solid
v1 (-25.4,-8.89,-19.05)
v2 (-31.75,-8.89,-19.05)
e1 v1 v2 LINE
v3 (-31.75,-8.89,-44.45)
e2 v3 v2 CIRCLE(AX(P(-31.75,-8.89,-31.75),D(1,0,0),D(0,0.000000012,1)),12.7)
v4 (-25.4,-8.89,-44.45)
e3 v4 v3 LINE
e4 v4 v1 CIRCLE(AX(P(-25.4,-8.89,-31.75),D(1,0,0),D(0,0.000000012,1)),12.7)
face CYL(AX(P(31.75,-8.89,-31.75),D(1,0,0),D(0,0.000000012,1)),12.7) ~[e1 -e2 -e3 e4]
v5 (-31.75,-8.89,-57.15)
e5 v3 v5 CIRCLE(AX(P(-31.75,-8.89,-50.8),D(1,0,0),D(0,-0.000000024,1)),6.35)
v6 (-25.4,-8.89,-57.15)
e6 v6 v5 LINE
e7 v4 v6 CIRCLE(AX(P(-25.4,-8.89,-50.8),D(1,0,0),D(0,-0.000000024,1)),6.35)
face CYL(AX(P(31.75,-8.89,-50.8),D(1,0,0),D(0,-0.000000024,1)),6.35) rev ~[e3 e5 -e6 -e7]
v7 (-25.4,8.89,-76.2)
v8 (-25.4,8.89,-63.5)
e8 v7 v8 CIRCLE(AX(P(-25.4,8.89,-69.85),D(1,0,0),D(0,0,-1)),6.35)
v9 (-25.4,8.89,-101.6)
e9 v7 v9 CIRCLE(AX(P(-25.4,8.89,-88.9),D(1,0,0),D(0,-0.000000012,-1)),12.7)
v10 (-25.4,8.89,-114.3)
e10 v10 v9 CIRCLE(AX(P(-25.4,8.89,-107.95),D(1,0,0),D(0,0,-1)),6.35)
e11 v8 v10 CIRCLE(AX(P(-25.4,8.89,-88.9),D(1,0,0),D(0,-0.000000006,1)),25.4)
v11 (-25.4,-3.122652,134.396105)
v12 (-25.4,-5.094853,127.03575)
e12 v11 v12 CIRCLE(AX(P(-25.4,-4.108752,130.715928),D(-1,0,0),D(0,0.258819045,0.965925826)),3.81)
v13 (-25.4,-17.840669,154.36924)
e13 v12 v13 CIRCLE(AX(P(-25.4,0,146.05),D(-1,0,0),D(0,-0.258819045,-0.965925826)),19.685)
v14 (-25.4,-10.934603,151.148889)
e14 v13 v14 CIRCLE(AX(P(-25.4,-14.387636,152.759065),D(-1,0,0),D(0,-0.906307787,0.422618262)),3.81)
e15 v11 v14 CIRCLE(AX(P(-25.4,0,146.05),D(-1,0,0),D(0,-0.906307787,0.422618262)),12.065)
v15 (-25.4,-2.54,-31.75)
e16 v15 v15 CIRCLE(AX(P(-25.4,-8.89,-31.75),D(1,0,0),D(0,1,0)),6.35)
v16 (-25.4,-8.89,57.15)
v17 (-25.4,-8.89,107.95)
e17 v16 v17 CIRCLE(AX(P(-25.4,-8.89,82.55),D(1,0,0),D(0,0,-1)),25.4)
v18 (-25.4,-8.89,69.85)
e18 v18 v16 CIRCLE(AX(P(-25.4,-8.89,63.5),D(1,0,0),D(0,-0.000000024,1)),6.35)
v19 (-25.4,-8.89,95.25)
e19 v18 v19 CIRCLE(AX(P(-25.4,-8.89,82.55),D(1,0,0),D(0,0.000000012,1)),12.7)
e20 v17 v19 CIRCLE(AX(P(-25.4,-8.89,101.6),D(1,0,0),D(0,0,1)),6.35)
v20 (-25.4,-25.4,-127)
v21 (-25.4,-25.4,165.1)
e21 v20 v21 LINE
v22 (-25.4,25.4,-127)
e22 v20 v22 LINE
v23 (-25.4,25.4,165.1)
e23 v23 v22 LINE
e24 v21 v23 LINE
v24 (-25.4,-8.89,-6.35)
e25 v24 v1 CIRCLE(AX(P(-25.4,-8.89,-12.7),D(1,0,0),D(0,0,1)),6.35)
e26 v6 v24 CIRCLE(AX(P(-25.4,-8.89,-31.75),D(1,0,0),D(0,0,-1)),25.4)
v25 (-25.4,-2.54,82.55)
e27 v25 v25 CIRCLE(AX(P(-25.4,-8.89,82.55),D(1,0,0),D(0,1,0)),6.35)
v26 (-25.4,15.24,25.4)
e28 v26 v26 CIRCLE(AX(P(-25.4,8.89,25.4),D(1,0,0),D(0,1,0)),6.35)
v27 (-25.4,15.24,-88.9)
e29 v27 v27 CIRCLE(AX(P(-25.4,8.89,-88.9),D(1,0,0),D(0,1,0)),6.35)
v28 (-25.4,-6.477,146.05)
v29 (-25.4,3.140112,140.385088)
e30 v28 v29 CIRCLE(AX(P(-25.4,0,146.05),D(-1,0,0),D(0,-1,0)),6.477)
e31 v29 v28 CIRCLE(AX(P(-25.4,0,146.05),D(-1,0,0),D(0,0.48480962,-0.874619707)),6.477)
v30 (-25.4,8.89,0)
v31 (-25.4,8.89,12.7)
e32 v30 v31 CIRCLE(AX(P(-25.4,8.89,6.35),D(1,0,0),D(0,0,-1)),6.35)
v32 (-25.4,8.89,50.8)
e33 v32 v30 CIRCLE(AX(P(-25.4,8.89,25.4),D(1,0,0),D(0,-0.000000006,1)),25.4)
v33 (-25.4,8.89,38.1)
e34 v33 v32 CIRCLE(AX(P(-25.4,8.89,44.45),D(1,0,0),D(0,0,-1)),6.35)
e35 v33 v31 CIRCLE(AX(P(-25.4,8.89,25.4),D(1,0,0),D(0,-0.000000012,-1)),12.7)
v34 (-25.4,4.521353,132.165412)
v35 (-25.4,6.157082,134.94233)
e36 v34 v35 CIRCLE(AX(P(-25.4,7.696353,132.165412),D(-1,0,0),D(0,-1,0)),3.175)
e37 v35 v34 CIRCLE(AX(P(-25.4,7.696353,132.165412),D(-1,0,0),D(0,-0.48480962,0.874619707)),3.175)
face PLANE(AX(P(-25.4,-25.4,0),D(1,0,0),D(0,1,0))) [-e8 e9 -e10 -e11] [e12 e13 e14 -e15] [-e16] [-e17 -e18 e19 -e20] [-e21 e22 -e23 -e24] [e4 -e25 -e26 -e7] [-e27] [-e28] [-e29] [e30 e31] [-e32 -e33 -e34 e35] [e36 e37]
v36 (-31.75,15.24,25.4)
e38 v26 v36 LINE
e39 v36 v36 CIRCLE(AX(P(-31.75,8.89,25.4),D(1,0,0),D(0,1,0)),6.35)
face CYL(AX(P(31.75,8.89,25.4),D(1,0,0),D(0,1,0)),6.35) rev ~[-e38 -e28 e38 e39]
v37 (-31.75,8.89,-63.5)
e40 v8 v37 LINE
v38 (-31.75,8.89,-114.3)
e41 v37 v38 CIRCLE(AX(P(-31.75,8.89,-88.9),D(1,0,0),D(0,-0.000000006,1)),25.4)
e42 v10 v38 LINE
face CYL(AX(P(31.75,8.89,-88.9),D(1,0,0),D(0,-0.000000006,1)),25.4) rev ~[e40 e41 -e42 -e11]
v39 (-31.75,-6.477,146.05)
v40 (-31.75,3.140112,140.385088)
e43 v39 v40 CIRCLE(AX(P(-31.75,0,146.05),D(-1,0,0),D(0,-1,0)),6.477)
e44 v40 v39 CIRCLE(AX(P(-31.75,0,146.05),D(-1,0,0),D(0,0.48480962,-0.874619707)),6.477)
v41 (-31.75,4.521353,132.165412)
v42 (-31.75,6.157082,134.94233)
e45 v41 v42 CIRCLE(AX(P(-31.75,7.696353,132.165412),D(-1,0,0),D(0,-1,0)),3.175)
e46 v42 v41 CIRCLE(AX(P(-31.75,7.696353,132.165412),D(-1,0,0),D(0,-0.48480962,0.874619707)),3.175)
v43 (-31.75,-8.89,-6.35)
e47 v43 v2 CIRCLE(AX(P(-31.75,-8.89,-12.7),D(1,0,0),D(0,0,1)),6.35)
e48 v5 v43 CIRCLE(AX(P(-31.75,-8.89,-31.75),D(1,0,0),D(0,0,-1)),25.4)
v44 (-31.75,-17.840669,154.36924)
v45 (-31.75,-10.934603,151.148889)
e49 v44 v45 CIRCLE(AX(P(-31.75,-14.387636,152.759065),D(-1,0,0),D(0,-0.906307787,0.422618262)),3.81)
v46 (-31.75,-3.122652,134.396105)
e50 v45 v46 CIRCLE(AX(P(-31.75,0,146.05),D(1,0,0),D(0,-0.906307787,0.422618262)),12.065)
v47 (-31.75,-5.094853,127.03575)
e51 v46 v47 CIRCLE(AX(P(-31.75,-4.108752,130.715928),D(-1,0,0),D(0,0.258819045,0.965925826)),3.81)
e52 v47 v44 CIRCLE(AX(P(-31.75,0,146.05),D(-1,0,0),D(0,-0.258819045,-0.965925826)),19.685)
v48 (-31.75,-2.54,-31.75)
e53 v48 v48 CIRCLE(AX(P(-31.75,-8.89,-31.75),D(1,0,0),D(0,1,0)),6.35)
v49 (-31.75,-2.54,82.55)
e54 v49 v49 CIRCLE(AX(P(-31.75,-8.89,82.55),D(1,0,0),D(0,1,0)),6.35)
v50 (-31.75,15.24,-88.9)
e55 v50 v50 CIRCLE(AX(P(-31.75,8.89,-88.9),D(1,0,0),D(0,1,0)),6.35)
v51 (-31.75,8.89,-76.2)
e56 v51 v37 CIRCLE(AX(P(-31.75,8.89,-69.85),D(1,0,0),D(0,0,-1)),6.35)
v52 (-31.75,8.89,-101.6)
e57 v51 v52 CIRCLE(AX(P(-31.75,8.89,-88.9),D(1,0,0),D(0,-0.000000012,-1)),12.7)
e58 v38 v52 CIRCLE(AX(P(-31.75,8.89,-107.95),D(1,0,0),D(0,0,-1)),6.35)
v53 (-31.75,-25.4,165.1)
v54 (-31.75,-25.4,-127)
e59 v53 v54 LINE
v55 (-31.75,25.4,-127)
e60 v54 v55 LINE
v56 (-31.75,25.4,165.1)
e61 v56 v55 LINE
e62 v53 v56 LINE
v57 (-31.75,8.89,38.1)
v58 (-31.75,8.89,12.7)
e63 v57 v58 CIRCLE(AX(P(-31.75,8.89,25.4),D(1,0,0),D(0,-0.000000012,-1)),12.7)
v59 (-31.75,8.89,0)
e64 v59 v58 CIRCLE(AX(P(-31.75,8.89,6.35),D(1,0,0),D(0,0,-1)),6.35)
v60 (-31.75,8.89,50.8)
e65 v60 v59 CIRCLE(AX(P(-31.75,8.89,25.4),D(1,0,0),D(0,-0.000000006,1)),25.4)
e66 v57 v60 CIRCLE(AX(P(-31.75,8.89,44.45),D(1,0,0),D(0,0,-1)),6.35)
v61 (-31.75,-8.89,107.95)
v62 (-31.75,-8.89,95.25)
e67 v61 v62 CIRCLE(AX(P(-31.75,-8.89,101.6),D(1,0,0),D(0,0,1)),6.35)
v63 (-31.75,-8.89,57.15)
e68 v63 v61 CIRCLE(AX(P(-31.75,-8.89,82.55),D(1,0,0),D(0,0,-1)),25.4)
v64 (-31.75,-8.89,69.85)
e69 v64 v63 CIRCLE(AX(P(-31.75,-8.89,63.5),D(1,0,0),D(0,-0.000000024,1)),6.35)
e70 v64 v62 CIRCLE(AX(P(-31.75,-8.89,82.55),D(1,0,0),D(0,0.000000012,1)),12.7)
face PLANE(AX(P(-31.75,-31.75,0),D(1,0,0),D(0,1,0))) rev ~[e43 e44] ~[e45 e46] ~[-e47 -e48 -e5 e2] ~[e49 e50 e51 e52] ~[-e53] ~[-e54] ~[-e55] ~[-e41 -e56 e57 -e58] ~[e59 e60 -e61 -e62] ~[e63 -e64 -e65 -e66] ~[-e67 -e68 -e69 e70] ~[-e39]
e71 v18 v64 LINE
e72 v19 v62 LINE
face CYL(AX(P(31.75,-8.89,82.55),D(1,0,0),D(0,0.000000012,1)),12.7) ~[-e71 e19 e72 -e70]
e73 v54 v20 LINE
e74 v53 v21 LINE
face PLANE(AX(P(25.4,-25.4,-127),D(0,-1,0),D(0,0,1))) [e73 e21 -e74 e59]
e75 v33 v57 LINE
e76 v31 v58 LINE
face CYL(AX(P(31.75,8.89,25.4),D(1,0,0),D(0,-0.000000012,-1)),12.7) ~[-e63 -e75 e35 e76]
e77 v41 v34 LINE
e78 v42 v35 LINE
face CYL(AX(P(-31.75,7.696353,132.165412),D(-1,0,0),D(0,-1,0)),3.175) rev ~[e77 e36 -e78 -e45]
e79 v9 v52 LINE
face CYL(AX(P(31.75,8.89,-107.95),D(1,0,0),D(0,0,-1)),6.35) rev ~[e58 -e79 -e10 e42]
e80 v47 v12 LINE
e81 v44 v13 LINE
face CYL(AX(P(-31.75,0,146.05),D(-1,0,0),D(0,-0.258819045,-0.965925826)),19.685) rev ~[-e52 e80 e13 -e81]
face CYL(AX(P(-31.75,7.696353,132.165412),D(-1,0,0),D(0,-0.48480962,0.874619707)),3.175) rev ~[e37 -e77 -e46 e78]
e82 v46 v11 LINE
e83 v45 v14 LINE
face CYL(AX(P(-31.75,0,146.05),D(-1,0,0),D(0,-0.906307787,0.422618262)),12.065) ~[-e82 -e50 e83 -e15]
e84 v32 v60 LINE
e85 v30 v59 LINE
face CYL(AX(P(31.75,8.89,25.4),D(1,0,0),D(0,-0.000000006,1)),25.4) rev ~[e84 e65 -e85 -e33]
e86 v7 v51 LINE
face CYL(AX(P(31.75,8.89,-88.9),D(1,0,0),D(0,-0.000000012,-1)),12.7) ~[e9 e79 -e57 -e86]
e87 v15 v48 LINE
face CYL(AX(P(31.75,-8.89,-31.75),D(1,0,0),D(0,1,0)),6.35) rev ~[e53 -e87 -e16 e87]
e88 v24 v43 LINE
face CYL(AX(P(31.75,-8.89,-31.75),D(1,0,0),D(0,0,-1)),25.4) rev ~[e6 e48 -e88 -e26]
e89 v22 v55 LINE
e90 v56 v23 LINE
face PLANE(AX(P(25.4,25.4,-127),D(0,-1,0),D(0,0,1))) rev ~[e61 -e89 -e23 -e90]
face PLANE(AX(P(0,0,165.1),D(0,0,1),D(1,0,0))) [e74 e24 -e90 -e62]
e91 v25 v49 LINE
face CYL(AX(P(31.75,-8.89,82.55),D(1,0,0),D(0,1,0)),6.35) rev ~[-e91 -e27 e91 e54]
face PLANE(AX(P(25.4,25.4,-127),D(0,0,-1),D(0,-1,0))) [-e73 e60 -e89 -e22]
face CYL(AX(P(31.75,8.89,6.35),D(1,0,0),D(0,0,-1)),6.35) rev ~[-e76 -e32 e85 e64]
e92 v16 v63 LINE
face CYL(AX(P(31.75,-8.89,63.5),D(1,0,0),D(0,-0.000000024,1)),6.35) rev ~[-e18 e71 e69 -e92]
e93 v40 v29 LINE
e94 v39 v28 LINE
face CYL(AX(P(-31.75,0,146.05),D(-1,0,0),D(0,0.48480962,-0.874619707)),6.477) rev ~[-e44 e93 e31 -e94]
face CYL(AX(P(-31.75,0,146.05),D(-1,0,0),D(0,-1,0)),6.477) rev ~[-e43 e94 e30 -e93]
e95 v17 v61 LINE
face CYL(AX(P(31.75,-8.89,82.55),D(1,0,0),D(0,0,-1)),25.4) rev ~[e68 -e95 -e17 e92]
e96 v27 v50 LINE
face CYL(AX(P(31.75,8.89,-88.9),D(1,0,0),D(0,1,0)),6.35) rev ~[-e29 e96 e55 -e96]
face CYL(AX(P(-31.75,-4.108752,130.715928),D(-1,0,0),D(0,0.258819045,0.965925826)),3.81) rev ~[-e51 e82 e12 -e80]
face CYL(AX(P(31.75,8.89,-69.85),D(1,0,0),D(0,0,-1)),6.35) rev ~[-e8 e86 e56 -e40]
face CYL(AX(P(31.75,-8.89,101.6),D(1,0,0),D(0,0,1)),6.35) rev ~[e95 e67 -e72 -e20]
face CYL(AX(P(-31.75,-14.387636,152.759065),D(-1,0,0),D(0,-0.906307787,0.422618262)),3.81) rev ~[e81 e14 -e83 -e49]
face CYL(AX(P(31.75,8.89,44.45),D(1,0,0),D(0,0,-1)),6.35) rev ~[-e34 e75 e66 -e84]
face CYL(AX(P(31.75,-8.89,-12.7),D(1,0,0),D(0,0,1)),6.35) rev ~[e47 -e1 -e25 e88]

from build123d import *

# Parameters (mm, degrees)
F0_W      = 63.5
F0_H      = 63.5
F0_W_2    = 50.8
F0_H_2    = 50.8
F1_DEPTH  = 165.1
F3_R      = 6.477
F4_DEPTH  = 25.4
F6_DEPTH  = 25.4
F7_R      = 6.35
F8_DEPTH  = 63.501
F9_W      = 145.7979530096
F9_H      = 377.9422044754
F9_W_2    = 50.8
F9_H_2    = 292.1
F10_DEPTH = 63.5
F11_W     = 97.6704657078
F11_H     = 338.8985395432
F12_DEPTH = 57.151


# Not quite as in the source:
# - ends of sketch curves that miss each other by under 0.0002 mm in the source are joined


with BuildPart() as f1:
    # F0 (on Top) → F1 (new body, symmetric)
    with BuildSketch(Plane.XY):
        Rectangle(F0_W, F0_H)
        Rectangle(F0_W_2, F0_H_2, mode=Mode.SUBTRACT)
    extrude(amount=F1_DEPTH, both=True)

    # F3 (on face) → F4 (cut)
    with BuildSketch(Plane.YZ.offset(31.75)):
        with Locations((0, 146.05)):
            Circle(F3_R)
        with BuildLine():
            ThreePointArc((10.1385245046, 129.1766616857), (14.6288058895, 132.8781640138), (17.8406687878, 137.7307595176))
            ThreePointArc((17.8406687878, 137.7307595176), (19.4934269332, 143.3103775076), (19.4426449846, 149.1294124443))
            ThreePointArc((19.4426449846, 149.1294124443), (15.0835370951, 152.2964897102), (11.9164598293, 147.9373818207))
            ThreePointArc((11.9164598293, 147.9373818207), (11.9475842494, 144.3708765369), (10.9346034506, 140.9511106721))
            ThreePointArc((10.9346034506, 140.9511106721), (8.9660423194, 137.9769392343), (6.2139343738, 135.708276517))
            ThreePointArc((6.2139343738, 135.708276517), (4.9104220235, 130.4801740359), (10.1385245046, 129.1766616857))
        make_face()
        with BuildLine():
            ThreePointArc((-10.1385245046, 129.1766616857), (-4.9104220235, 130.4801740359), (-6.2139343738, 135.708276517))
            ThreePointArc((-6.2139343738, 135.708276517), (-8.9660423194, 137.9769392343), (-10.9346034506, 140.9511106721))
            ThreePointArc((-10.9346034506, 140.9511106721), (-11.9475842494, 144.3708765369), (-11.9164598293, 147.9373818207))
            ThreePointArc((-11.9164598293, 147.9373818207), (-15.0835370951, 152.2964897102), (-19.4426449846, 149.1294124443))
            ThreePointArc((-19.4426449846, 149.1294124443), (-19.4934269332, 143.3103775076), (-17.8406687878, 137.7307595176))
            ThreePointArc((-17.8406687878, 137.7307595176), (-14.6288058895, 132.8781640138), (-10.1385245046, 129.1766616857))
        make_face()
    extrude(amount=-F4_DEPTH, mode=Mode.SUBTRACT)

    # F5 (on face) → F6 (cut)
    with BuildSketch(Plane(origin=(-31.75, 0, 0), x_dir=(0, -1, 0), z_dir=(-1, 0, 0))):
        with BuildLine():
            ThreePointArc((-3.1401119103, 140.3850881569), (3.2873259769, 140.4692279278), (6.477, 146.05))
            ThreePointArc((6.477, 146.05), (-3.2873259769, 151.6307720722), (-3.1401119103, 140.3850881569))
        make_face()
        with BuildLine():
            ThreePointArc((-4.5213527214, 132.1654121492), (-4.960680137, 133.7768464516), (-6.1570821771, 134.9423297193))
            ThreePointArc((-6.1570821771, 134.9423297193), (-10.4320253058, 130.5539778468), (-4.5213527214, 132.1654121492))
        make_face()
        with BuildLine():
            ThreePointArc((3.1226517792, 134.3961049058), (0.4285749428, 129.7298269458), (5.0948529028, 127.0357501095))
            ThreePointArc((5.0948529028, 127.0357501095), (17.8406687878, 137.7307595176), (17.8406687878, 154.3692404824))
            ThreePointArc((17.8406687878, 154.3692404824), (12.777460542, 156.2120975737), (10.9346034506, 151.1488893279))
            ThreePointArc((10.9346034506, 151.1488893279), (10.9346034506, 140.9511106721), (3.1226517792, 134.3961049058))
        make_face()
    extrude(amount=-F6_DEPTH, mode=Mode.SUBTRACT)

    # F7 (on face) → F8 (cut, through all)
    with BuildSketch(Plane.YZ.offset(31.75)):
        with BuildLine():
            ThreePointArc((-8.89, 107.949999693), (-15.239999693, 101.6), (-8.89, 95.250000307))
            ThreePointArc((-8.89, 95.250000307), (3.81, 82.55), (-8.89, 69.85))
            ThreePointArc((-8.89, 69.85), (-15.239999693, 63.5), (-8.89, 57.150000307))
            ThreePointArc((-8.89, 57.150000307), (16.509999693, 82.55), (-8.89, 107.949999693))
        make_face()
        with BuildLine():
            ThreePointArc((8.89, 3.07e-07), (15.239999693, 6.35), (8.89, 12.699999693))
            ThreePointArc((8.89, 12.699999693), (-3.81, 25.4), (8.89, 38.1))
            ThreePointArc((8.89, 38.1), (15.24, 44.45), (8.89, 50.8))
            ThreePointArc((8.89, 50.8), (-16.509999693, 25.4), (8.89, 3.07e-07))
        make_face()
        with BuildLine():
            ThreePointArc((-8.89, -6.350000307), (-15.239999693, -12.7), (-8.89, -19.049999693))
            ThreePointArc((-8.89, -19.049999693), (3.81, -31.75), (-8.89, -44.45))
            ThreePointArc((-8.89, -44.45), (-15.239999693, -50.8), (-8.89, -57.149999693))
            ThreePointArc((-8.89, -57.149999693), (16.509999693, -31.75), (-8.89, -6.350000307))
        make_face()
        with BuildLine():
            ThreePointArc((8.89, -114.299999693), (15.239999693, -107.95), (8.89, -101.600000307))
            ThreePointArc((8.89, -101.600000307), (-3.81, -88.9), (8.89, -76.2))
            ThreePointArc((8.89, -76.2), (15.24, -69.85), (8.89, -63.5))
            ThreePointArc((8.89, -63.5), (-16.509999693, -88.9), (8.89, -114.299999693))
        make_face()
        with Locations((-8.89, 82.55)):
            Circle(F7_R)
        with Locations((8.89, 25.4)):
            Circle(F7_R)
        with Locations((8.89, -88.9)):
            Circle(F7_R)
        with Locations((-8.89, -31.75)):
            Circle(F7_R)
    extrude(amount=-F8_DEPTH, mode=Mode.SUBTRACT)

    # F9 (on face) → F10 (cut, symmetric)
    with BuildSketch(Plane(origin=(25.4, 0, 0), x_dir=(0, -1, 0), z_dir=(-1, 0, 0))):
        Rectangle(F9_W, F9_H)
        with Locations((0, 19.05)):
            Rectangle(F9_W_2, F9_H_2, mode=Mode.SUBTRACT)
    extrude(amount=F10_DEPTH, both=True, mode=Mode.SUBTRACT)

    # F11 (on face) → F12 (cut, through all)
    with BuildSketch(Plane.YZ.offset(-25.4)):
        Rectangle(F11_W, F11_H)
    extrude(amount=F12_DEPTH, mode=Mode.SUBTRACT)


solid = f1.part
